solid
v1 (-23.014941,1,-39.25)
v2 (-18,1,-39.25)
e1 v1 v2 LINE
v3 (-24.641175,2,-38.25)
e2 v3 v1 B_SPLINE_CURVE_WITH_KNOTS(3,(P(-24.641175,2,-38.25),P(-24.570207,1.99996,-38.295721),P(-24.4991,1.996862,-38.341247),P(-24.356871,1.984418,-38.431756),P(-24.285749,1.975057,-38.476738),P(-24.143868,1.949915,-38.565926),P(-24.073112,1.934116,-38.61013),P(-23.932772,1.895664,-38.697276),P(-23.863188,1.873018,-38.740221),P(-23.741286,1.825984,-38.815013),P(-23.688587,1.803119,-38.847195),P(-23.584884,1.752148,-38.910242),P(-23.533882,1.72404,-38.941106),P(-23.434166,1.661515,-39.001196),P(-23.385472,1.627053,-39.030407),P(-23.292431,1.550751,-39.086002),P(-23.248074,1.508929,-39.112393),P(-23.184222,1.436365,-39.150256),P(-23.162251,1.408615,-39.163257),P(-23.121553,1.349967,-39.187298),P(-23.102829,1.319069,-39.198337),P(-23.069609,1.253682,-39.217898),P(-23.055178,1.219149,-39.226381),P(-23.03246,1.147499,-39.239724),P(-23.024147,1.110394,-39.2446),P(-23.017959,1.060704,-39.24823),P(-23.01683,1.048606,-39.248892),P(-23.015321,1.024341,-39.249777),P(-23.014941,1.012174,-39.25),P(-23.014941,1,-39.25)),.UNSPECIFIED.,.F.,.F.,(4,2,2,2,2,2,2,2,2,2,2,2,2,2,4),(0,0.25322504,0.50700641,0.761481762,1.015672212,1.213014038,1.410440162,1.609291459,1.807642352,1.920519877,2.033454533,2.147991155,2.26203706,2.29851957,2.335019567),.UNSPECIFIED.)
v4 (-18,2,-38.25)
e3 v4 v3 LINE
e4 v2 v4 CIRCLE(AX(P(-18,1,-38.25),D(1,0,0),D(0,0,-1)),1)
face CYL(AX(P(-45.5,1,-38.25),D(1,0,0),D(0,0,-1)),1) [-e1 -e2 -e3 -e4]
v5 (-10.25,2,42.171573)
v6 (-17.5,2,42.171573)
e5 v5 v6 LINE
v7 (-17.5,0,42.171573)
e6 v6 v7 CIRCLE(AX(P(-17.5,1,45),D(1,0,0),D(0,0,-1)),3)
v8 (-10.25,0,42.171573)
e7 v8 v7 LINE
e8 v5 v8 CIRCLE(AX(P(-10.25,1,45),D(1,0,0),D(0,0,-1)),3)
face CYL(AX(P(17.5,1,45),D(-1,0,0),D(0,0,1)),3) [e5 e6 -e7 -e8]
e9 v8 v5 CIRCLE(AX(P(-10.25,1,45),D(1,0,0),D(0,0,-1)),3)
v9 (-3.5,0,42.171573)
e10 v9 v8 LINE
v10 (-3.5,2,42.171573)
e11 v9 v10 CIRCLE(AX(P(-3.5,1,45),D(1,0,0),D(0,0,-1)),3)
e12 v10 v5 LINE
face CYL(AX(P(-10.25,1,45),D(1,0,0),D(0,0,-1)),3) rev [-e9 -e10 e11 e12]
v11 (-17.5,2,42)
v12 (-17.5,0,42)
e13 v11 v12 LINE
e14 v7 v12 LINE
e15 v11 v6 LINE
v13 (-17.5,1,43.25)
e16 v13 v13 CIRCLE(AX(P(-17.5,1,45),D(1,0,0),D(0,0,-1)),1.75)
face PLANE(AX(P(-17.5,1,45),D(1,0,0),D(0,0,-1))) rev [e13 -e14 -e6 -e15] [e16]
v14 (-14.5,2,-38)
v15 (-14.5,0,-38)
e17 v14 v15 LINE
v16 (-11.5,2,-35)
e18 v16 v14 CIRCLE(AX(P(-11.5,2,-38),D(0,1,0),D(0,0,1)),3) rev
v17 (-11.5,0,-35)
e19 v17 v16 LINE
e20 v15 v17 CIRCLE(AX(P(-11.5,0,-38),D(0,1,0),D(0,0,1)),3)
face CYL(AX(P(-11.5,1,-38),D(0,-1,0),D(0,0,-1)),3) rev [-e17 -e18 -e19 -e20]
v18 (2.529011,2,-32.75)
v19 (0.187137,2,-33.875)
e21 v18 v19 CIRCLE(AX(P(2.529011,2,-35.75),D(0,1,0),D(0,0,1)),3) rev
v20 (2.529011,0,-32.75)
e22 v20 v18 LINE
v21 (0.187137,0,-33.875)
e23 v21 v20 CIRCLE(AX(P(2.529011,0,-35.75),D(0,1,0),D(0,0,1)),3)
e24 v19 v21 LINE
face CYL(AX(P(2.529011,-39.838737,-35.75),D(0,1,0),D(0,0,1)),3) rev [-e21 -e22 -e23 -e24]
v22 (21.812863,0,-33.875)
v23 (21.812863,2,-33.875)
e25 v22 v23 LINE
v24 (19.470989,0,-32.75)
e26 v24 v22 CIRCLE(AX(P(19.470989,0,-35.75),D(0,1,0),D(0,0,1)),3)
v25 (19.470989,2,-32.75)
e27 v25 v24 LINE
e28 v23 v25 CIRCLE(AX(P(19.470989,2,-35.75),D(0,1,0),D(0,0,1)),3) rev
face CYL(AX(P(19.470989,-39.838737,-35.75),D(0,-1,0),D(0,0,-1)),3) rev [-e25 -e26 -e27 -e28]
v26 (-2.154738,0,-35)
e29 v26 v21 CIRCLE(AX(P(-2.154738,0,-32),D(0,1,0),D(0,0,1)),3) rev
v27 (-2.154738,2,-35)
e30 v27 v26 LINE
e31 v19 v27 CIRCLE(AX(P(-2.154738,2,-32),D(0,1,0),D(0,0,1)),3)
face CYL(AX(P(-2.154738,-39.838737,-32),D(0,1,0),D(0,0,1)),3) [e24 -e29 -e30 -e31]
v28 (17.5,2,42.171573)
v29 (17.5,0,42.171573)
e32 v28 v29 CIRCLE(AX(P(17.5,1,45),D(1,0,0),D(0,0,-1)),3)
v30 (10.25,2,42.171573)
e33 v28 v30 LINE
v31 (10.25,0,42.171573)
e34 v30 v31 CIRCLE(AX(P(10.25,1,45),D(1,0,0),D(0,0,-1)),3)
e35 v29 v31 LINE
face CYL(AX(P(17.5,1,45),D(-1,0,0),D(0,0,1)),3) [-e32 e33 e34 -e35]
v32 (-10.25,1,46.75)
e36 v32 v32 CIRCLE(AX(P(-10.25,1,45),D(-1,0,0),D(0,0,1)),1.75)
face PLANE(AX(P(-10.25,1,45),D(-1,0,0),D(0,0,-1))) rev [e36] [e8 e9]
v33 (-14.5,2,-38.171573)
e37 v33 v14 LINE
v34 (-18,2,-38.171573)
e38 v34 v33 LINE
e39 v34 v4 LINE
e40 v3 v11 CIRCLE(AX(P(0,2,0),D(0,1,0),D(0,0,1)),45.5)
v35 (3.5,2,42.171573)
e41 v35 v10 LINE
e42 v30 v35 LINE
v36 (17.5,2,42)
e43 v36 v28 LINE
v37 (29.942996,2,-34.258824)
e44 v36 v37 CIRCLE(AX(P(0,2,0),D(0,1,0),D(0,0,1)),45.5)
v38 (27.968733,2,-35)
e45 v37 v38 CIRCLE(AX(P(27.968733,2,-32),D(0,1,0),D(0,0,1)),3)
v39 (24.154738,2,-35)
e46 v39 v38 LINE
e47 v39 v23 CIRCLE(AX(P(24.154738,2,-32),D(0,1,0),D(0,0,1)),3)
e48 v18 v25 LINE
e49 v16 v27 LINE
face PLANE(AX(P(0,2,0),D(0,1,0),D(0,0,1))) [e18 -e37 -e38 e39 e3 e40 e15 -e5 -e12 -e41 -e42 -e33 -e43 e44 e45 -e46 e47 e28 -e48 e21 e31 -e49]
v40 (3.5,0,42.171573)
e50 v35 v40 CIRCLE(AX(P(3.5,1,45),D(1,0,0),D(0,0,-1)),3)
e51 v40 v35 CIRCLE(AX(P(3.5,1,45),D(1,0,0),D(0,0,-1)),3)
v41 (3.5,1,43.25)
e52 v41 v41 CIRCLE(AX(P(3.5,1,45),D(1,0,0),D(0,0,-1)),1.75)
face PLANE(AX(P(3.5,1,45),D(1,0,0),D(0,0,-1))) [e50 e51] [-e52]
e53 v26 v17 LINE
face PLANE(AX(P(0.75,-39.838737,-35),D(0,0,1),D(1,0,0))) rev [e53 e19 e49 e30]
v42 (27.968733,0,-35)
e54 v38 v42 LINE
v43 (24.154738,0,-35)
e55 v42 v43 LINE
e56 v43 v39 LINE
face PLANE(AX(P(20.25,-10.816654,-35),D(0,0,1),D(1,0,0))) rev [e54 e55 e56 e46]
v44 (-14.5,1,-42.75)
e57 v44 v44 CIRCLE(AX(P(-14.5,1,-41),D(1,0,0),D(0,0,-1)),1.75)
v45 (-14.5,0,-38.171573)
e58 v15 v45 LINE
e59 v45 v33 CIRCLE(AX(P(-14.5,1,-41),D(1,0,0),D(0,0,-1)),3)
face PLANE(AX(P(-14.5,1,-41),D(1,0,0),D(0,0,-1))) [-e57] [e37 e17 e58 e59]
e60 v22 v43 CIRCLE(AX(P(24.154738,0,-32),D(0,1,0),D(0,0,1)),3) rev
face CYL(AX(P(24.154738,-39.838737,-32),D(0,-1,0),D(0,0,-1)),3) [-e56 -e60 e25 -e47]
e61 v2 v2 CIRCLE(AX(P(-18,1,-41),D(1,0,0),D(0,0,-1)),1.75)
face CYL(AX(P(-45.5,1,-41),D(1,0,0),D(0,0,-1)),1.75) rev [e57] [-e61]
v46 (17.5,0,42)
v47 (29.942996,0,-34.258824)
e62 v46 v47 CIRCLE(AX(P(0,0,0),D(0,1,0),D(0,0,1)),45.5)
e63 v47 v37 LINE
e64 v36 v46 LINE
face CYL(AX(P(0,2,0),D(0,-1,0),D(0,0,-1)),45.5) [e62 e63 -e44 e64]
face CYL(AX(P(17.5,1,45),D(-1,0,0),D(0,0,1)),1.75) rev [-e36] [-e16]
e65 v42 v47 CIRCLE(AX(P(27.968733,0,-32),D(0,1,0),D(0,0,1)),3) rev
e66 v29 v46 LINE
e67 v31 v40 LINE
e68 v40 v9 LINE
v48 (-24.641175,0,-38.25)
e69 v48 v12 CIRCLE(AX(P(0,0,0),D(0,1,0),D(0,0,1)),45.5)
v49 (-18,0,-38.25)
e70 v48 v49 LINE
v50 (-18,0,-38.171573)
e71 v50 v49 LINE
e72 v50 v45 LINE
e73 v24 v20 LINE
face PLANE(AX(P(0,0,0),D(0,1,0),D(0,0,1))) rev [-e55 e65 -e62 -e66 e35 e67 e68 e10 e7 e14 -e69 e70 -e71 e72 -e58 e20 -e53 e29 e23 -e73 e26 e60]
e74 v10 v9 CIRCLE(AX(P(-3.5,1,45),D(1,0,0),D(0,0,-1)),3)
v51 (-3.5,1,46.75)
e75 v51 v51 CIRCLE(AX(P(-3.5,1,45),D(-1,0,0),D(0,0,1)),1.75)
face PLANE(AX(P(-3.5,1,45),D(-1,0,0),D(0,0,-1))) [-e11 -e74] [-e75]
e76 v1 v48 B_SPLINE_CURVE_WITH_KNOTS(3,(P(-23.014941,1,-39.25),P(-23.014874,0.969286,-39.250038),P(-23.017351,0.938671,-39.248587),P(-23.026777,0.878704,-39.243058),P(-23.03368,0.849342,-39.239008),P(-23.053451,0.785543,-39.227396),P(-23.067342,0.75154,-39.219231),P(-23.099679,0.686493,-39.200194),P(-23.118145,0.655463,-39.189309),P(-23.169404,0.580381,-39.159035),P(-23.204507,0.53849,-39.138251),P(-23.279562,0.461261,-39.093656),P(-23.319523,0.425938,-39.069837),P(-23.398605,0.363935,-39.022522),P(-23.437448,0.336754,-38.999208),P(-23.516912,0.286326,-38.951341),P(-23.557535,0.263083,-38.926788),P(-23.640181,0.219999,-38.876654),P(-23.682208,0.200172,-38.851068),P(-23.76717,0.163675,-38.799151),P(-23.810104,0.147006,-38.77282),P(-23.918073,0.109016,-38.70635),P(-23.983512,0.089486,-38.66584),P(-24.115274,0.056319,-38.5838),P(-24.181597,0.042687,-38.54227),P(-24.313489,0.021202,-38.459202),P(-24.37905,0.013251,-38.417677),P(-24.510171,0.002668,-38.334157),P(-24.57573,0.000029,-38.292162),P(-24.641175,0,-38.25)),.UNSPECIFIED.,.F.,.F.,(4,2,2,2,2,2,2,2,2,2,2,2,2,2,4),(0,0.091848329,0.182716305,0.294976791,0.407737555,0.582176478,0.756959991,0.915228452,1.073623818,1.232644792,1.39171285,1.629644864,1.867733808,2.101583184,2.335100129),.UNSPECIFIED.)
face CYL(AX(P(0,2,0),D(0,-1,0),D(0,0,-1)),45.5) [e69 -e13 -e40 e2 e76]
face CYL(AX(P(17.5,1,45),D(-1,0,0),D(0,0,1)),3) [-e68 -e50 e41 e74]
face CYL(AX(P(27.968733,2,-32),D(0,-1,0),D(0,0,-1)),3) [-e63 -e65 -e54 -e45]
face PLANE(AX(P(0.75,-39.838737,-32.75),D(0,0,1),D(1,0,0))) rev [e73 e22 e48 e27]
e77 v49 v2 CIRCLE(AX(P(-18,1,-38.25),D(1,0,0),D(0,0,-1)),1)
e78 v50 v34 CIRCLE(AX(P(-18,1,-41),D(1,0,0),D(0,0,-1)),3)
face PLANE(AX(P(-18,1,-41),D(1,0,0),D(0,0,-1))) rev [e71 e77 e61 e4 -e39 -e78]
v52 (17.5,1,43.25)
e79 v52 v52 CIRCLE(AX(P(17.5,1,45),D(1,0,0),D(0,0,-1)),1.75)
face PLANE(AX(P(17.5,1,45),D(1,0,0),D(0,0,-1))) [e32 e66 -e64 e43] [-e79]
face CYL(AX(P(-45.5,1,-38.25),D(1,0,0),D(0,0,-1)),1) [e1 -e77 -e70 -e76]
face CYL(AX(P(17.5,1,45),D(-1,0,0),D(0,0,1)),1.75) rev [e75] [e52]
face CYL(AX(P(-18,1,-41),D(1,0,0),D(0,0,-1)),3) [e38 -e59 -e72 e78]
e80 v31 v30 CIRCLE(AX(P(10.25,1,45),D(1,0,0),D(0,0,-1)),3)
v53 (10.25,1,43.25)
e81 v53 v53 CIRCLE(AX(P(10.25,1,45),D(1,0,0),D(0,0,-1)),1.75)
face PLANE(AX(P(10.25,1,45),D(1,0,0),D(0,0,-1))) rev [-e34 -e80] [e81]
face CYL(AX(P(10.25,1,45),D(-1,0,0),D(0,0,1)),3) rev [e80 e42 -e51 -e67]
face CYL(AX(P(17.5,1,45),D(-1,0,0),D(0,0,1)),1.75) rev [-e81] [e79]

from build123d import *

# Parameters (mm, degrees)
BOSS_EXTRUDE1_DEPTH = 2
BOSS_EXTRUDE2_START = -17.5
SKETCH2_R           = 1.75
BOSS_EXTRUDE2_DEPTH = 35
SKETCH3_R           = 3
CUT_EXTRUDE1_DEPTH  = 6.75
CUT_EXTRUDE2_DEPTH  = 2
BOSS_EXTRUDE4_START = -0.5
BOSS_EXTRUDE4_DEPTH = 3.5
SKETCH6_R           = 1.75
CUT_EXTRUDE3_DEPTH  = 77.941536247
FILLET1_R           = 1
SKETCH7_W           = 9
SKETCH7_H           = 6
CUT_EXTRUDE4_DEPTH  = 2
FILLET2_R           = 3
FILLET3_R           = 3


# Some blends are built 0.0001 mm under size
with BuildPart() as part:
    # Sketch1 → Boss-Extrude1 (new body)
    with BuildSketch(Plane(origin=(0, 0, 0), x_dir=(1, 0, 0), z_dir=(0, 1, 0))):
        with BuildLine():
            Line((-17.5, -42), (17.5, -42))
            ThreePointArc((17.5, -42), (45.5, 0), (17.5, 42))
            Line((17.5, 42), (-17.5, 42))
            ThreePointArc((-17.5, 42), (-45.5, 0), (-17.5, -42))
        make_face()
    extrude(amount=BOSS_EXTRUDE1_DEPTH)

    # Sketch2 → Boss-Extrude2 (add)
    with BuildSketch(Plane(origin=(0, 0, 0), x_dir=(0, 0, -1), z_dir=(1, 0, 0)).offset(BOSS_EXTRUDE2_START)):
        with BuildLine():
            Line((-42, 0), (-42.171572875, 0))
            ThreePointArc((-42.171572875, 0), (-48, 1), (-42.171572875, 2))
            Line((-42.171572875, 2), (-42, 2))
            Line((-42, 2), (-42, 1))
            Line((-42, 1), (-42, 0))
        make_face()
        with Locations((-45, 1)):
            Circle(SKETCH2_R, mode=Mode.SUBTRACT)
    extrude(amount=BOSS_EXTRUDE2_DEPTH)

    # Sketch3 → Cut-Extrude1 (cut)
    with BuildSketch(Plane(origin=(3.5, 0, 0), x_dir=(0, 0, -1), z_dir=(1, 0, 0))):
        with Locations((-45, 1)):
            Circle(SKETCH3_R)
    cut_extrude1 = extrude(amount=CUT_EXTRUDE1_DEPTH, mode=Mode.SUBTRACT)

    # Mirror1: Cut-Extrude1 across plane
    add(cut_extrude1.mirror(Plane(origin=(0, 0, 0), x_dir=(0, 0, 1), z_dir=(1, 0, 0))), mode=Mode.SUBTRACT)

    # Sketch4 → Cut-Extrude2 (cut)
    with BuildSketch(Plane(origin=(0, 2, 0), x_dir=(1, 0, 0), z_dir=(0, 1, 0))):
        Polygon((0.75, 42), (21.25, 42), (21.25, 32.75), (0.75, 32.75), (0.75, 35), (-17.5, 35), (-17.5, 42), align=None)
    extrude(amount=-CUT_EXTRUDE2_DEPTH, mode=Mode.SUBTRACT)

    # Sketch5 → Boss-Extrude4 (add)
    with BuildSketch(Plane(origin=(-17.5, 0, 0), x_dir=(0, 0, -1), z_dir=(1, 0, 0)).offset(BOSS_EXTRUDE4_START)):
        with BuildLine():
            Line((35, 1), (35, 2))
            Line((35, 2), (38.171572875, 2))
            ThreePointArc((38.171572875, 2), (44, 1), (38.171572875, 0))
            Line((38.171572875, 0), (35, 0))
            Line((35, 0), (35, 1))
        make_face()
    extrude(amount=BOSS_EXTRUDE4_DEPTH)

    # Sketch6 → Cut-Extrude3 (cut, through all)
    with BuildSketch(Plane(origin=(-14.5, 0, 0), x_dir=(0, 0, -1), z_dir=(1, 0, 0))):
        with Locations((41, 1)):
            Circle(SKETCH6_R)
    extrude(amount=-CUT_EXTRUDE3_DEPTH, mode=Mode.SUBTRACT)

    # Fillet1
    fillet1_edges = [part.edges().sort_by_distance(p)[0] for p in [
        (-20.235557777, 0, -39.563859338),
        (-20.235557777, 2, -39.563859338),
    ]]
    fillet(fillet1_edges, radius=FILLET1_R - 0.0001)  # a hair under: the kernel refuses the full size

    # Sketch7 → Cut-Extrude4 (cut)
    with BuildSketch(Plane(origin=(0, 2, 0), x_dir=(1, 0, 0), z_dir=(0, 1, 0))):
        with Locations((24.75, 38)):
            Rectangle(SKETCH7_W, SKETCH7_H)
    extrude(amount=-CUT_EXTRUDE4_DEPTH, mode=Mode.SUBTRACT)

    # Fillet2
    # the kernel refuses this fillet: 3 mm, written as the material it adds along each edge
    with BuildSketch(Plane(origin=(-14.5, 0, -35), x_dir=(0, 0, -1), z_dir=(0, 1, 0))) as fillet2_piece_1:
        with BuildLine():
            CenterArc((FILLET2_R, -FILLET2_R), FILLET2_R, 90, 90)
            Line((0, -FILLET2_R), (0, 0))
            Line((0, 0), (FILLET2_R, 0))
        make_face()
    extrude(amount=2)
    # the kernel refuses this fillet: 3 mm, written as the material it takes off along each edge
    with BuildSketch(Plane(origin=(29.07318352, 4.856917414, -35), x_dir=(-1, 0, 0), z_dir=(0, -1, 0))) as fillet2_2_piece_1:
        with BuildLine():
            CenterArc((1.104450978, -3), FILLET2_R, 90, 41.15420196)
            ThreePointArc((-0.869812495, -0.741176471), (-0.43723324, -0.367857378), (0, 0))
            Line((0, 0), (1.104450978, 0))
        make_face()
    extrude(amount=7.713834827, mode=Mode.SUBTRACT)
    with BuildSketch(Plane(origin=(21.25, -7.261843774, -35), x_dir=(0, 0, 1), z_dir=(0, 1, 0))) as fillet2_2_piece_2:
        with BuildLine():
            CenterArc((3, 2.90473751), FILLET2_R, 180, 75.522487814)
            Line((0, 2.90473751), (0, 0))
            Line((0, 0), (2.25, 0))
        make_face()
    extrude(amount=16.523687548, mode=Mode.SUBTRACT)
    with BuildSketch(Plane(origin=(0.75, 9.261843774, -35), x_dir=(-1, 0, 0), z_dir=(0, -1, 0))) as fillet2_2_piece_3:
        with BuildLine():
            CenterArc((2.90473751, -3), FILLET2_R, 90, 75.522487814)
            Line((0, -2.25), (0, 0))
            Line((0, 0), (2.90473751, 0))
        make_face()
    extrude(amount=16.523687548, mode=Mode.SUBTRACT)

    # Fillet3
    fillet3_edges = [part.edges().sort_by_distance(p)[0] for p in [
        (21.25, 1, -32.75),
        (0.75, 1, -32.75),
    ]]
    fillet(fillet3_edges, radius=FILLET3_R)


solid = part.part
